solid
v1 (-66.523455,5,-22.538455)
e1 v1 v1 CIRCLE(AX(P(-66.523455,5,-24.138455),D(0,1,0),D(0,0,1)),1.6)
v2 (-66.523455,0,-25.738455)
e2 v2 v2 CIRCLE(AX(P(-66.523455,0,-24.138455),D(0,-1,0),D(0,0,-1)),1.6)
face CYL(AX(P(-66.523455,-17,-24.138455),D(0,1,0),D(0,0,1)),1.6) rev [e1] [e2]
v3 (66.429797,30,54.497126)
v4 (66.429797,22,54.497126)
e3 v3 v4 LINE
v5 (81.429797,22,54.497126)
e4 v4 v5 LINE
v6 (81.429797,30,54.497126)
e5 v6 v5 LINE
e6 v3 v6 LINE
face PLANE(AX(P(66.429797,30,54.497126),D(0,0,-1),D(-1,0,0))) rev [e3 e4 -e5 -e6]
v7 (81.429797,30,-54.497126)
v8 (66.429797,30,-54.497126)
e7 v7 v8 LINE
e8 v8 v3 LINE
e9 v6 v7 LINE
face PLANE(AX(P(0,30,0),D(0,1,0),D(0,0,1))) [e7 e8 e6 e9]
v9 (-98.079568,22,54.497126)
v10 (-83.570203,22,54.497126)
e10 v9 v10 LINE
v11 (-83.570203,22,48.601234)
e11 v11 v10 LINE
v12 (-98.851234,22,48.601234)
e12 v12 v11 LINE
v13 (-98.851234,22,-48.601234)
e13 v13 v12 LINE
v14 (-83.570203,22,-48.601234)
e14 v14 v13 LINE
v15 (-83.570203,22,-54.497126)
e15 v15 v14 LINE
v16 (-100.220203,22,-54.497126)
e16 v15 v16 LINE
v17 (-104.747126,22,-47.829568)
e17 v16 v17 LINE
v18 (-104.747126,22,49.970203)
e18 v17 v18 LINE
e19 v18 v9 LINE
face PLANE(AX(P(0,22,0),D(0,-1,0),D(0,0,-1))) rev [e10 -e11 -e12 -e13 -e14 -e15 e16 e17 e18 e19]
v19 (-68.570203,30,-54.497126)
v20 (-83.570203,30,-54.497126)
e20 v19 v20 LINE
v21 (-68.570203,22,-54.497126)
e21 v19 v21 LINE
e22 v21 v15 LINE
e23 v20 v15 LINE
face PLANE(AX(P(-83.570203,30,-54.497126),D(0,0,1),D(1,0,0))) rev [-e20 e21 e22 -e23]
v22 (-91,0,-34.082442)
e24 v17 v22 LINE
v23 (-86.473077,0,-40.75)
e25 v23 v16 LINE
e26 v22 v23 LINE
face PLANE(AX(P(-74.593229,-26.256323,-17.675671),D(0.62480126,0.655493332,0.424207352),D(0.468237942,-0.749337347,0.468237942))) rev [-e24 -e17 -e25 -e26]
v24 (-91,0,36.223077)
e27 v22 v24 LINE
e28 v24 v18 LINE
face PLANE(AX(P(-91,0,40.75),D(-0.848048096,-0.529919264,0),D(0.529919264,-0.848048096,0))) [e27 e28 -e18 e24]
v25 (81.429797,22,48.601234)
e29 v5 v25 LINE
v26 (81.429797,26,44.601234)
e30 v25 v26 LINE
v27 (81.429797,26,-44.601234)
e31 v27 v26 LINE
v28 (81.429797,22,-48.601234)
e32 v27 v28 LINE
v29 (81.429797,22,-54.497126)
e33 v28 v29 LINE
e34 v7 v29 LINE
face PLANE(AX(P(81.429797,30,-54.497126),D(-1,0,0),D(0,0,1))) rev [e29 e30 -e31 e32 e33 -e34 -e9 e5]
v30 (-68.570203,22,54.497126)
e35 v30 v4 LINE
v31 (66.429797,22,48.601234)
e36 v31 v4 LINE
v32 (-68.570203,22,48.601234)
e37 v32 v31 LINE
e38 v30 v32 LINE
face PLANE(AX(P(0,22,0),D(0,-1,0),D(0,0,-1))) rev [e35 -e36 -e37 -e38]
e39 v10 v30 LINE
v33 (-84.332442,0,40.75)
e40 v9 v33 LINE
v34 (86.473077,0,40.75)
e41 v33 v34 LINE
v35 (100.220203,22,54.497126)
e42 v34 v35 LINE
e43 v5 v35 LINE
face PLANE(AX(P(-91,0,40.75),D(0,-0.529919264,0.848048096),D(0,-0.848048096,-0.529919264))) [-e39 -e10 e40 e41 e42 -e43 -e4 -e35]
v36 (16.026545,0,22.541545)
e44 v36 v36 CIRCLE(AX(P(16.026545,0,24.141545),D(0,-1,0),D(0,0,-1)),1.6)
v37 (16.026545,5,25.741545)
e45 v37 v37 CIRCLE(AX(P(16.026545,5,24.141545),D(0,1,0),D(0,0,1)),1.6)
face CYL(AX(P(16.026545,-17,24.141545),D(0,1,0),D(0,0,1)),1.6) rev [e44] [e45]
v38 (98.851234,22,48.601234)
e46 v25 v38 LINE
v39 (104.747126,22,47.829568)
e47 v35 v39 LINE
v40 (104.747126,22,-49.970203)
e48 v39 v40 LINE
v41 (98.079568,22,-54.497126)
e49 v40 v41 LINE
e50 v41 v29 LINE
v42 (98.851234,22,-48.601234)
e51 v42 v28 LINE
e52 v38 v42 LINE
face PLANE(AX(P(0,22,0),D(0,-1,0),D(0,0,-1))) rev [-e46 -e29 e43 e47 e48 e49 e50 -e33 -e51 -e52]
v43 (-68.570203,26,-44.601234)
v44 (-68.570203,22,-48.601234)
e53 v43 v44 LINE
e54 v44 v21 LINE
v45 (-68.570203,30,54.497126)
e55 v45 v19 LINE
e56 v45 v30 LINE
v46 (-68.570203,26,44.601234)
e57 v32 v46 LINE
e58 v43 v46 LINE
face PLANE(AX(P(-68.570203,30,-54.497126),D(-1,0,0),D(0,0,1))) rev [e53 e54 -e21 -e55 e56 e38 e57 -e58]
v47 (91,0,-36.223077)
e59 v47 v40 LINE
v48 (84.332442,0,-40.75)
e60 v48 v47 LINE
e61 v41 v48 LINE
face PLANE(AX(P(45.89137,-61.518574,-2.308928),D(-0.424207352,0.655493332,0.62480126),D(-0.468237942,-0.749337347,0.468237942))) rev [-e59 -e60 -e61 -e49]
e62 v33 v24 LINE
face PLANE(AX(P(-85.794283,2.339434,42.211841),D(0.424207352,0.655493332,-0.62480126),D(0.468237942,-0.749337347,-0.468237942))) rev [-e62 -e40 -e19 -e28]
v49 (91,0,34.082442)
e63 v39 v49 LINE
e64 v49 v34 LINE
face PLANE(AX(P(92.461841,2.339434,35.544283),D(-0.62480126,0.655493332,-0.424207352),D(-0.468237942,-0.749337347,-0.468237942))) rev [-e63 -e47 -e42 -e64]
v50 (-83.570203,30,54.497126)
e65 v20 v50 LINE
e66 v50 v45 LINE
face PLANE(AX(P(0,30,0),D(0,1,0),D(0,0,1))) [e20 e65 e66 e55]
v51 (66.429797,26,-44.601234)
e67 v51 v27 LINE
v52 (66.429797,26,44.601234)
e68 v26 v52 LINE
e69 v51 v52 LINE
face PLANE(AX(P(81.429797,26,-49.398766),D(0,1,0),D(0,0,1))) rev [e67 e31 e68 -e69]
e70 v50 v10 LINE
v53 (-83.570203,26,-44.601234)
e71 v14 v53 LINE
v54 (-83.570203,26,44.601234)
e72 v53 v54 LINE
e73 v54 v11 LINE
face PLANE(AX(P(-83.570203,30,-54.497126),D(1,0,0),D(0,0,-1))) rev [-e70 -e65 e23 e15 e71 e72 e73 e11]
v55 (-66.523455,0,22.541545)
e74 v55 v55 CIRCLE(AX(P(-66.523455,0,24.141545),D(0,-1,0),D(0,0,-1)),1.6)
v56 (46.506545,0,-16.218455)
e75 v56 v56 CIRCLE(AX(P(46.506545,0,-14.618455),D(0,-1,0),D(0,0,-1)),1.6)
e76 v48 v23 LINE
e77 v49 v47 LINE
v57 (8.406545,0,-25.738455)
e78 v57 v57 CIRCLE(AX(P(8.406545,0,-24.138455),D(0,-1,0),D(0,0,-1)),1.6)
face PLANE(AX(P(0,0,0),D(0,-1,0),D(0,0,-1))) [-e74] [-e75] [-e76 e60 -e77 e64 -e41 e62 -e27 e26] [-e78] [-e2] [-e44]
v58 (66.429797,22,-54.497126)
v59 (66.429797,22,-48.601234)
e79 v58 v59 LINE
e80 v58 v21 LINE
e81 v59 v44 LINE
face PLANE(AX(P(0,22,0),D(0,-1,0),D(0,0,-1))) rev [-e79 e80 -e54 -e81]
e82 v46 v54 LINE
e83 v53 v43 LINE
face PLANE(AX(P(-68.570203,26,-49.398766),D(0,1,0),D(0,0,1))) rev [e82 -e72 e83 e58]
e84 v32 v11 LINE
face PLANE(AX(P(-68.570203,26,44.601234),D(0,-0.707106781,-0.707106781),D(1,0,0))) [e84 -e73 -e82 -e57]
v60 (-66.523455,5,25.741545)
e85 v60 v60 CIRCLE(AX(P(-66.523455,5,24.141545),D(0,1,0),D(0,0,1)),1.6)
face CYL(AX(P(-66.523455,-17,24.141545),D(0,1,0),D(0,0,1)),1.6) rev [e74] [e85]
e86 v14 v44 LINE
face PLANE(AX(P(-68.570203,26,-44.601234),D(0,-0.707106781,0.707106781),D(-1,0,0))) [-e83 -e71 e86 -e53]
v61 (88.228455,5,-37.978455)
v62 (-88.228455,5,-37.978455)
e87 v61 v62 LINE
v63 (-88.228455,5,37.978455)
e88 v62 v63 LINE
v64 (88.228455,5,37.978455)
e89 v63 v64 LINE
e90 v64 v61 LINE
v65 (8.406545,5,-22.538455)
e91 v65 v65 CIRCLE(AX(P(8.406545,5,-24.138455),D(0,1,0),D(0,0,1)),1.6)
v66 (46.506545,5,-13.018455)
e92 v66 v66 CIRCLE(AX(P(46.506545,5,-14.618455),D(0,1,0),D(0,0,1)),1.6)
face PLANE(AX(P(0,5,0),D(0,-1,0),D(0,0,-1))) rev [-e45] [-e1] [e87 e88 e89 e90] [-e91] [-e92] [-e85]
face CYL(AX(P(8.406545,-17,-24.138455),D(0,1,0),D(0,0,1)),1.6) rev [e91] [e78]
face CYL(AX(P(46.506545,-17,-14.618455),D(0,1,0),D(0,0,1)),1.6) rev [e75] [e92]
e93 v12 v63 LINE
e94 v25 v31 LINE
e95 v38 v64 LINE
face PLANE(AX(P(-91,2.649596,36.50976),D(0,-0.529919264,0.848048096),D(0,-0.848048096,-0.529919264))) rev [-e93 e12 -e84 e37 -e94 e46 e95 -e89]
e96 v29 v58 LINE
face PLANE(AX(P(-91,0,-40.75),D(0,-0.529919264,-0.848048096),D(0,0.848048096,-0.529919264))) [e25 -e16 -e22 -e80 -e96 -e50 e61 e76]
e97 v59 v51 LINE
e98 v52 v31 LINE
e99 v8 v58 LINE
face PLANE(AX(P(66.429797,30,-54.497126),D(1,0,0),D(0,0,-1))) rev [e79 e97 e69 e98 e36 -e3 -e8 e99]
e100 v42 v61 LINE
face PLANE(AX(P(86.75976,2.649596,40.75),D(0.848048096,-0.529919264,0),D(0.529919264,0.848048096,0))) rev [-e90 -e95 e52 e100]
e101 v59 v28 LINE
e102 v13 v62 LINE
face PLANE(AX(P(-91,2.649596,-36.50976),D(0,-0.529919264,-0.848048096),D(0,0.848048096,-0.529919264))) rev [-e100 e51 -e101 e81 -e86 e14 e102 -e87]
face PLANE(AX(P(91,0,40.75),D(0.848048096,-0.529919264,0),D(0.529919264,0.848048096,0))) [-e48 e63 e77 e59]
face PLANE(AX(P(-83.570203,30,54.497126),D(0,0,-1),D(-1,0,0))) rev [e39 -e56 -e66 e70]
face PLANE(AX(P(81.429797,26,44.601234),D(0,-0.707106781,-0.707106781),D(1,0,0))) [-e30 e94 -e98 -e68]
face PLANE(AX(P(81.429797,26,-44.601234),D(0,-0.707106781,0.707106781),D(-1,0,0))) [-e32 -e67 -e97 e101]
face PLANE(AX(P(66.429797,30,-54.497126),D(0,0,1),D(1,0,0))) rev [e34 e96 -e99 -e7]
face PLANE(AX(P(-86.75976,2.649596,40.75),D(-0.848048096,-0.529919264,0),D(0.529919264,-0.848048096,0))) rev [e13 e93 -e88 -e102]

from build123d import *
from OCP.BRepFilletAPI import BRepFilletAPI_MakeChamfer

# Parameters (mm, degrees)
SKETCH1_W           = 182
SKETCH1_H           = 81.5
BOSS_EXTRUDE1_DEPTH = 22
BOSS_EXTRUDE1_DRAFT = -32
SHELL1_T            = -5
SKETCH2_R           = 1.6
CUT_EXTRUDE1_DEPTH  = 22
CHAMFER1_SIZE       = 4
CHAMFER1_SIZE2      = 5.891470361
SKETCH3_W           = 15
SKETCH3_H           = 5.895892017
BOSS_EXTRUDE2_DEPTH = 8
SKETCH6_W           = 15
SKETCH6_H           = 4
BOSS_EXTRUDE3_DEPTH = 98
SKETCH7_W           = 15
SKETCH7_H           = 4
BOSS_EXTRUDE4_DEPTH = 98
CHAMFER2_SIZE       = 4


with BuildPart() as part:
    # Sketch1 → Boss-Extrude1 (with draft: the straight prism first)
    with BuildSketch(Plane(origin=(0, 0, 0), x_dir=(1, 0, 0), z_dir=(0, 1, 0))):
        Rectangle(SKETCH1_W, SKETCH1_H)
    extrude(amount=BOSS_EXTRUDE1_DEPTH)
    # Boss-Extrude1: the draft: its side faces are tilted about the plane it starts from
    boss_extrude1_sides = [part.faces().sort_by_distance(p)[0] for p in [
        (0, 11, 40.75),
        (91, 11, 0),
        (0, 11, -40.75),
        (-91, 11, 0),
    ]]
    draft(boss_extrude1_sides, Plane(origin=(0, 0, 0), x_dir=(1, 0, 0), z_dir=(0, 1, 0)), BOSS_EXTRUDE1_DRAFT)

    # Shell1
    shell1_openings = [part.faces().sort_by_distance(p)[0] for p in [
        (0, 22, 0),
    ]]
    offset(amount=SHELL1_T, openings=shell1_openings, kind=Kind.INTERSECTION)

    # Sketch2 → Cut-Extrude1 (cut)
    with BuildSketch(Plane(origin=(0, 5, 0), x_dir=(1, 0, 0), z_dir=(0, 1, 0))):
        with Locations(Location((-66.523454743, 24.138454743, 0), (0, 0, 270))):
            Circle(SKETCH2_R)
        with Locations(Location((-66.523454743, -24.141545257, 0), (0, 0, 270))):
            Circle(SKETCH2_R)
        with Locations(Location((8.406545257, 24.138454743, 0), (0, 0, 270))):
            Circle(SKETCH2_R)
        with Locations(Location((16.026545257, -24.141545257, 0), (0, 0, 270))):
            Circle(SKETCH2_R)
        with Locations(Location((46.506545257, 14.618454743, 0), (0, 0, 270))):
            Circle(SKETCH2_R)
    extrude(amount=-CUT_EXTRUDE1_DEPTH, mode=Mode.SUBTRACT)

    # Chamfer1: one chamfer whose edges measure the first distance from different faces: ONE call of the kernel's chamfer builder (chamfer() names one face for all edges)
    chamfer1_edges_1 = [part.edges().sort_by_distance(p)[0] for p in [
        (97.873562871, 11, 47.623562871),
    ]]
    chamfer1_side_1 = [part.faces().sort_by_distance(p)[0] for p in [
        (0, 11.257506349, 47.784470697),
    ]]
    chamfer1_edges_2 = [part.edges().sort_by_distance(p)[0] for p in [
        (-97.873562871, 11, 47.623562871),
    ]]
    chamfer1_side_2 = [part.faces().sort_by_distance(p)[0] for p in [
        (-98.204252581, 11.529214161, 0),
    ]]
    chamfer1_edges_3 = [part.edges().sort_by_distance(p)[0] for p in [
        (-97.873562871, 11, -47.623562871),
    ]]
    chamfer1_side_3 = [part.faces().sort_by_distance(p)[0] for p in [
        (0, 11.257506349, -47.784470697),
    ]]
    chamfer1_edges_4 = [part.edges().sort_by_distance(p)[0] for p in [
        (97.873562871, 11, -47.623562871),
    ]]
    chamfer1_side_4 = [part.faces().sort_by_distance(p)[0] for p in [
        (98.204252581, 11.529214161, 0),
    ]]
    chamfer1 = BRepFilletAPI_MakeChamfer(part.part.solid().wrapped)
    for e in chamfer1_edges_1:
        chamfer1.Add(CHAMFER1_SIZE, CHAMFER1_SIZE2, e.wrapped, chamfer1_side_1[0].wrapped)  # the first distance lies on this face
    for e in chamfer1_edges_2:
        chamfer1.Add(CHAMFER1_SIZE, CHAMFER1_SIZE2, e.wrapped, chamfer1_side_2[0].wrapped)  # the first distance lies on this face
    for e in chamfer1_edges_3:
        chamfer1.Add(CHAMFER1_SIZE, CHAMFER1_SIZE2, e.wrapped, chamfer1_side_3[0].wrapped)  # the first distance lies on this face
    for e in chamfer1_edges_4:
        chamfer1.Add(CHAMFER1_SIZE, CHAMFER1_SIZE2, e.wrapped, chamfer1_side_4[0].wrapped)  # the first distance lies on this face
    add(Compound.cast(chamfer1.Shape()), mode=Mode.REPLACE)

    # Sketch3 → Boss-Extrude2 (add)
    with BuildSketch(Plane(origin=(0, 22, 0), x_dir=(1, 0, 0), z_dir=(0, 1, 0))):
        with Locations((-76.070202855, 51.549179733)):
            Rectangle(SKETCH3_W, SKETCH3_H)
        with Locations((73.929797145, 51.549179733)):
            Rectangle(SKETCH3_W, SKETCH3_H)
        with Locations((-76.070202855, -51.549179733)):
            Rectangle(SKETCH3_W, SKETCH3_H)
        with Locations((73.929797145, -51.549179733)):
            Rectangle(SKETCH3_W, SKETCH3_H)
    extrude(amount=BOSS_EXTRUDE2_DEPTH)

    # Sketch6 → Boss-Extrude3 (add)
    with BuildSketch(Plane(origin=(0, 0, 48.601233725), x_dir=(-1, 0, 0), z_dir=(0, 0, -1))):
        with Locations((-73.929797145, 28)):
            Rectangle(SKETCH6_W, SKETCH6_H)
    extrude(amount=BOSS_EXTRUDE3_DEPTH)

    # Sketch7 → Boss-Extrude4 (add)
    with BuildSketch(Plane(origin=(0, 0, 48.601233725), x_dir=(-1, 0, 0), z_dir=(0, 0, -1))):
        with Locations((76.070202855, 28)):
            Rectangle(SKETCH7_W, SKETCH7_H)
    extrude(amount=BOSS_EXTRUDE4_DEPTH)

    # Chamfer2
    chamfer2_edges = [part.edges().sort_by_distance(p)[0] for p in [
        (-76.070202855, 26, 48.601233725),
        (-76.070202855, 26, -48.601233725),
        (73.929797145, 26, 48.601233725),
        (73.929797145, 26, -48.601233725),
    ]]
    chamfer(chamfer2_edges, length=CHAMFER2_SIZE - 0.0001)  # a hair under: the kernel refuses the full size


solid = part.part
